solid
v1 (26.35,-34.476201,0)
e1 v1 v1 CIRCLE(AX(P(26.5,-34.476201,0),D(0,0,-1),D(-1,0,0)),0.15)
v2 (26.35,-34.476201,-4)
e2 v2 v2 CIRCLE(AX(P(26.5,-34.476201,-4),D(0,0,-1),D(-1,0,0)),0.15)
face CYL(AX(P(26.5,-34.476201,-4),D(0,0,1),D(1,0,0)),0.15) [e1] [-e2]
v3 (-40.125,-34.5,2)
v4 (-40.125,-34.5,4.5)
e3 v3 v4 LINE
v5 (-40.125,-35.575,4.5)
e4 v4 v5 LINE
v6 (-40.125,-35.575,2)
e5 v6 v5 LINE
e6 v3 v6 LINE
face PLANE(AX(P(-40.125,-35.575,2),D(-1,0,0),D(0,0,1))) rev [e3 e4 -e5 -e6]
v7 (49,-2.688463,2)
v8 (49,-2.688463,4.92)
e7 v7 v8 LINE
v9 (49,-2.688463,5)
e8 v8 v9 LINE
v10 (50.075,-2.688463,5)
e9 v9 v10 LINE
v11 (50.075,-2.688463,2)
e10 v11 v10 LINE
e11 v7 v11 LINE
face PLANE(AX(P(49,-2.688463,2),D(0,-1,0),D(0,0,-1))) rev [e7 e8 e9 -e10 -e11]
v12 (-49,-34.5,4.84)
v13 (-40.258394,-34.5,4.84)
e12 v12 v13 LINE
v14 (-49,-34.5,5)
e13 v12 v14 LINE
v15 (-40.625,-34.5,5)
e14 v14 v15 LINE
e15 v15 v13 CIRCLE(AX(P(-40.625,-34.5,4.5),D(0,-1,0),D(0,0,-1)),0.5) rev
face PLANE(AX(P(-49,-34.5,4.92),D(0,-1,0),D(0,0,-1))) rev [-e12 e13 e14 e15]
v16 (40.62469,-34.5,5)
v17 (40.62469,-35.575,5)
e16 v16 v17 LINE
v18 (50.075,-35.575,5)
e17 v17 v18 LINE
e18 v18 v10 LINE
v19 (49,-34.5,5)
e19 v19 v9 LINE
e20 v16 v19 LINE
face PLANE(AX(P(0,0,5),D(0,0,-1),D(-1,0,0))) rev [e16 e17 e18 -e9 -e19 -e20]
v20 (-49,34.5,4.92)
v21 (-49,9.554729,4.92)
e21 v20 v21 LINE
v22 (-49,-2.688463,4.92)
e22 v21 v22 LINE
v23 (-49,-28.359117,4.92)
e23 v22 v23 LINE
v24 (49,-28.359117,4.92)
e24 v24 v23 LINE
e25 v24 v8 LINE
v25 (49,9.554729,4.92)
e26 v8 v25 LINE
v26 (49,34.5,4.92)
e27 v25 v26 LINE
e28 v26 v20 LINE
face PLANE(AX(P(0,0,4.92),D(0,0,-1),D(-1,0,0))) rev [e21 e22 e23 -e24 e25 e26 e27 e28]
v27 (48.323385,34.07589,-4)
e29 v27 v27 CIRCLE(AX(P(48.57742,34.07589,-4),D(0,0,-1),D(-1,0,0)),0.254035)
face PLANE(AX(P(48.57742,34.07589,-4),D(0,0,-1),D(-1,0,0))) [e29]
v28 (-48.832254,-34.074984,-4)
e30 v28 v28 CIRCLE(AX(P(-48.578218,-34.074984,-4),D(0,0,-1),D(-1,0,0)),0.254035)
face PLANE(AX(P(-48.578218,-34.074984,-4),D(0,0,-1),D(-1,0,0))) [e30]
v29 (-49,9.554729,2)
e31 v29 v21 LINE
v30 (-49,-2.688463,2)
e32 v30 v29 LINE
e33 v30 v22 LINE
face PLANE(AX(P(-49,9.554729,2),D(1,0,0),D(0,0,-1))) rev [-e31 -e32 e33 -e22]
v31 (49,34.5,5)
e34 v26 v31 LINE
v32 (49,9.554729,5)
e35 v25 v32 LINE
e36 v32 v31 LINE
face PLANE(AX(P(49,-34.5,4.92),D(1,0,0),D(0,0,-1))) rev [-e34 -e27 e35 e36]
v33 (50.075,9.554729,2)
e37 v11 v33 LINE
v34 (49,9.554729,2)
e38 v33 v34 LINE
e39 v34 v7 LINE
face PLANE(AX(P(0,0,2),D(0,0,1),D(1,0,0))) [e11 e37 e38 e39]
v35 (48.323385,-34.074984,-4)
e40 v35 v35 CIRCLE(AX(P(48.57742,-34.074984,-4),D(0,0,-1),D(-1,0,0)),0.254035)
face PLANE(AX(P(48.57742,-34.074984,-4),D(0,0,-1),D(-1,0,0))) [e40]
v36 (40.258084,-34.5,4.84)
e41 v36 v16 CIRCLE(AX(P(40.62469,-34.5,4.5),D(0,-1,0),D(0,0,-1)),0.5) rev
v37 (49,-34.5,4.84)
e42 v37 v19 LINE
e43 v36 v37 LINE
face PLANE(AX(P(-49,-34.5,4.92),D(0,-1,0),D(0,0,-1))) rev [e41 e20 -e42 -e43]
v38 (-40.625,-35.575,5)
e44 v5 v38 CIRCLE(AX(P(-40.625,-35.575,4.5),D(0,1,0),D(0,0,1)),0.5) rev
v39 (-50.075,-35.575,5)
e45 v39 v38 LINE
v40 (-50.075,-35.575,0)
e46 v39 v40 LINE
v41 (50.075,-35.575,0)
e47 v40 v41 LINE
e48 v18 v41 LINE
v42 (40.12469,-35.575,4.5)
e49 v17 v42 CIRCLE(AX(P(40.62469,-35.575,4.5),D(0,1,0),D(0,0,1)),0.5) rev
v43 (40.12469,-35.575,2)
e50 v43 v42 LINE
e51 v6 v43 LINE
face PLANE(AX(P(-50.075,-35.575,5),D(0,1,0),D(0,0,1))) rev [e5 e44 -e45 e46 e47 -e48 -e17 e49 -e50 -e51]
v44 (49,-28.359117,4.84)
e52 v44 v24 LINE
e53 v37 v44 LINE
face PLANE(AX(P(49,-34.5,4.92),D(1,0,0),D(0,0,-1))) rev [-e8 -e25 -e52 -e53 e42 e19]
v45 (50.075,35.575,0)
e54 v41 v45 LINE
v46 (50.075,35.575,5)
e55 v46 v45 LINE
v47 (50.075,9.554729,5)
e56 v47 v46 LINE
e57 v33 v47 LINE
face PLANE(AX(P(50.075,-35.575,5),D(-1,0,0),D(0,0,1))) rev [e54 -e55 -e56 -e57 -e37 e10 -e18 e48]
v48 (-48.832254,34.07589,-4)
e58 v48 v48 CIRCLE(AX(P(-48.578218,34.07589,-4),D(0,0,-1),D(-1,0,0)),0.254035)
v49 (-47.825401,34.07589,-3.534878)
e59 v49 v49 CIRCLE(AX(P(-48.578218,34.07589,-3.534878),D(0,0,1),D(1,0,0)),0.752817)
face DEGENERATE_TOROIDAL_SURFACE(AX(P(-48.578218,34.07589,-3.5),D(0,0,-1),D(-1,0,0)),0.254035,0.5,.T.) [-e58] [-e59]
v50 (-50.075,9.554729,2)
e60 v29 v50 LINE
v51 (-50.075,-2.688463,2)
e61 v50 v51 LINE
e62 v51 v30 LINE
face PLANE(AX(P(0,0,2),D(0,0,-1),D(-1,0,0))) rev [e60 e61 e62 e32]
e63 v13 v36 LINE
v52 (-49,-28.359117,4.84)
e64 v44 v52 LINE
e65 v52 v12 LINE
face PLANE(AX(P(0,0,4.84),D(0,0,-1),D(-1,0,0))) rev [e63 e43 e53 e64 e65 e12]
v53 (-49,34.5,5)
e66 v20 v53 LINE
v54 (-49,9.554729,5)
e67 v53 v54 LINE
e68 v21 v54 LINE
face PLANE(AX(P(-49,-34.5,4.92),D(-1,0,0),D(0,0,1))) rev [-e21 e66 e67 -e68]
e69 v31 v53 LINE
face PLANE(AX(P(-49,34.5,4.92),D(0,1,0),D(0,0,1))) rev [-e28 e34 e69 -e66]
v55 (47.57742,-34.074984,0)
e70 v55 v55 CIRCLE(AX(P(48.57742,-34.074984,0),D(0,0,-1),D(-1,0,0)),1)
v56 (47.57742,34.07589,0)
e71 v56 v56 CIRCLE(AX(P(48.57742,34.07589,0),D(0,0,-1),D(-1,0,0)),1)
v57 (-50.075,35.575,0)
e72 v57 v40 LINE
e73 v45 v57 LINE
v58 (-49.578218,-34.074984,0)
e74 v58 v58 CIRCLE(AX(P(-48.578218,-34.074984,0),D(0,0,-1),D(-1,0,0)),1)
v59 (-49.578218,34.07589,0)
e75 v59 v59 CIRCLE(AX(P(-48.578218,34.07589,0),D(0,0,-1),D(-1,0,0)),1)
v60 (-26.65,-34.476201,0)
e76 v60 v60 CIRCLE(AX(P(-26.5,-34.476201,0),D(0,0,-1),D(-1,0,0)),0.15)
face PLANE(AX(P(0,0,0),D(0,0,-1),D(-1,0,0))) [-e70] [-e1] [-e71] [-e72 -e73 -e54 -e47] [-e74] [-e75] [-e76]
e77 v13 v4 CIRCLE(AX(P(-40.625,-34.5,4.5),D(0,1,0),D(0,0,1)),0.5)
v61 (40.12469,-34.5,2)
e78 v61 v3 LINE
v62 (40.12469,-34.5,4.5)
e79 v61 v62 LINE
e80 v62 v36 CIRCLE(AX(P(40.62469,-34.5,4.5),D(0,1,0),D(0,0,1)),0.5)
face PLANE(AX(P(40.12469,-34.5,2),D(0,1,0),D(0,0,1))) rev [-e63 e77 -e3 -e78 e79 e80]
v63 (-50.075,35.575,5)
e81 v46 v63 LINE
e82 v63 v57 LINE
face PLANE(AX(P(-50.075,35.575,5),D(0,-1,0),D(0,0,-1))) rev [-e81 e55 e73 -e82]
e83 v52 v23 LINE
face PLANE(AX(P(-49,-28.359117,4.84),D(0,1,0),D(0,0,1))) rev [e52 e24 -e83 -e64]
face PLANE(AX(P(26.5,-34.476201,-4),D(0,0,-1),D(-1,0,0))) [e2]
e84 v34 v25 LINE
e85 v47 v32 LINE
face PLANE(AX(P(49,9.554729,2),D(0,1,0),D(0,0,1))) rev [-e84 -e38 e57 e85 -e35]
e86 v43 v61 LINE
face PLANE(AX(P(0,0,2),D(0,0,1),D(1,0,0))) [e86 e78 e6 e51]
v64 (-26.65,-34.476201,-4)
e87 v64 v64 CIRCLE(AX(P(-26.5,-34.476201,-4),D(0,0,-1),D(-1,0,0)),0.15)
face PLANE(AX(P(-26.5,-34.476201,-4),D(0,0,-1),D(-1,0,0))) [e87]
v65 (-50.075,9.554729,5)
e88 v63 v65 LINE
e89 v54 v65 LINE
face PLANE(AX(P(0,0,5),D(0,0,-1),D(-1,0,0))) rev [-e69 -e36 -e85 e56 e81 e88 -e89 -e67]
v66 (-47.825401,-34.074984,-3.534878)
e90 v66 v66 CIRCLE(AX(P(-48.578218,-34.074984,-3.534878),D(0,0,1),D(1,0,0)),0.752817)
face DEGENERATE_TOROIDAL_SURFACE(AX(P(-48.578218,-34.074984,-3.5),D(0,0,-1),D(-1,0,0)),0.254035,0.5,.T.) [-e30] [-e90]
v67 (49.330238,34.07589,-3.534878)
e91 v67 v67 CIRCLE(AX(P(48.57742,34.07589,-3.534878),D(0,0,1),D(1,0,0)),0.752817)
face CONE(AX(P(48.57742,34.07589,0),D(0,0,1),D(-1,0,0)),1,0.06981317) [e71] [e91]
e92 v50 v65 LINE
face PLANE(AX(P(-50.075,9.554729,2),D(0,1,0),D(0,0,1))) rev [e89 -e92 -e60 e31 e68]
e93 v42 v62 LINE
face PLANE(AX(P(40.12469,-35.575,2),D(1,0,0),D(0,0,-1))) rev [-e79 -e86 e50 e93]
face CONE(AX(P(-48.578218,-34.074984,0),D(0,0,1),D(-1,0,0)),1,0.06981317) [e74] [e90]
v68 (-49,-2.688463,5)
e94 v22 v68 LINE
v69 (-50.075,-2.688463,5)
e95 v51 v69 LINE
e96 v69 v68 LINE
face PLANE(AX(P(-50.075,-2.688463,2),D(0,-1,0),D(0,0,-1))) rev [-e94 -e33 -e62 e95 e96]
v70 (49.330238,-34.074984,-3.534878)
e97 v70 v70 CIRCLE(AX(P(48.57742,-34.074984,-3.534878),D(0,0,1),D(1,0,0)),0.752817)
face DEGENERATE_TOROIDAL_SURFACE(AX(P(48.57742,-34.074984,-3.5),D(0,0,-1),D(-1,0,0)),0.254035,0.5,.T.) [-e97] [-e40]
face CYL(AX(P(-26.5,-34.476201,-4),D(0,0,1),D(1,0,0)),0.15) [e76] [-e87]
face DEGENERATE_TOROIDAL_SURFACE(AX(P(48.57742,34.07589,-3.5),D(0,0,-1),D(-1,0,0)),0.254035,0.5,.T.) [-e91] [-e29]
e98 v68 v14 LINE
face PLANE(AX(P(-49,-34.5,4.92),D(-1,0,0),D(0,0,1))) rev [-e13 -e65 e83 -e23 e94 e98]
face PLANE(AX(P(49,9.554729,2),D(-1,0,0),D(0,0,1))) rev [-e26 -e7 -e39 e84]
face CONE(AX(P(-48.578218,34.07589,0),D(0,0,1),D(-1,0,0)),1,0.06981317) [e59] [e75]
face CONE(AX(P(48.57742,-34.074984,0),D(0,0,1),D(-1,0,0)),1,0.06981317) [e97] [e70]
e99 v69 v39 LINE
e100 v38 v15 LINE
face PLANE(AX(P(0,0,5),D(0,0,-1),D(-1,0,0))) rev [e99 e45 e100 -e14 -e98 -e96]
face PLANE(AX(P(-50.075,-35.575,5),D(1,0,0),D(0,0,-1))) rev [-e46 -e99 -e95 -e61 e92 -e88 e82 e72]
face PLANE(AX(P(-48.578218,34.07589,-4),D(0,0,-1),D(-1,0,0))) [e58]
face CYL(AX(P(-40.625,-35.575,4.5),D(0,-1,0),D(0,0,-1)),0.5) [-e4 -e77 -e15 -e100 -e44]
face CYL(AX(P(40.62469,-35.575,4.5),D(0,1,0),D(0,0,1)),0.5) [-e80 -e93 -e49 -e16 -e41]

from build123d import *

# Parameters (mm, degrees)
ESQUISSE2_W                  = 100.15
ESQUISSE2_H                  = 71.15
BOSS_EXTRU_1_DEPTH           = 5
ESQUISSE3_W                  = 98
ESQUISSE3_H                  = 69
ENL_V_MAT_EXTRU_1_DEPTH      = 0.08
ESQUISSE4_W                  = 98
ESQUISSE4_H                  = 6.140882506
ENL_V_MAT_EXTRU_2_DEPTH      = 0.08
ESQUISSE5_W                  = 80.249689796
ESQUISSE5_H                  = 1.075
ENL_V_MAT_EXTRU_3_DEPTH      = 3
CONG_1_R                     = 0.5
CONG_2_R                     = 0.5
ESQUISSE7_W                  = 1.075
ESQUISSE7_H                  = 12.243191877
ENL_V_MAT_EXTRU_4_DEPTH      = 3
ESQUISSE8_R                  = 1
BOSS_EXTRU_3_DEPTH           = 4
BOSS_EXTRU_3_DRAFT           = 4
BOSS_EXTRU_3_PROFILE_2_DEPTH = 4
BOSS_EXTRU_3_PROFILE_2_DRAFT = 4
BOSS_EXTRU_3_PROFILE_3_DEPTH = 4
BOSS_EXTRU_3_PROFILE_3_DRAFT = 4
BOSS_EXTRU_3_PROFILE_4_DEPTH = 4
BOSS_EXTRU_3_PROFILE_4_DRAFT = 4
CONG_3_R                     = 0.5
CONG_4_R                     = 0.5
CONG_5_R                     = 0.5
CONG_6_R                     = 0.5
ESQUISSE9_R                  = 0.15
BOSS_EXTRU_5_DEPTH           = 4


with BuildPart() as part:
    # Esquisse2 → Boss.-Extru.1 (new body)
    with BuildSketch(Plane.XY):
        Rectangle(ESQUISSE2_W, ESQUISSE2_H)
    extrude(amount=BOSS_EXTRU_1_DEPTH)

    # Esquisse3 → Enlèv. mat.-Extru.1 (cut)
    with BuildSketch(Plane.XY.offset(5)):
        Rectangle(ESQUISSE3_W, ESQUISSE3_H)
    extrude(amount=-ENL_V_MAT_EXTRU_1_DEPTH, mode=Mode.SUBTRACT)

    # Esquisse4 → Enlèv. mat.-Extru.2 (cut)
    with BuildSketch(Plane.XY.offset(4.92)):
        with Locations((0, -31.429558747)):
            Rectangle(ESQUISSE4_W, ESQUISSE4_H)
    extrude(amount=-ENL_V_MAT_EXTRU_2_DEPTH, mode=Mode.SUBTRACT)

    # Esquisse5 → Enlèv. mat.-Extru.3 (cut)
    with BuildSketch(Plane.XY.offset(5)):
        with Locations((-0.000155102, -35.0375)):
            Rectangle(ESQUISSE5_W, ESQUISSE5_H)
    extrude(amount=-ENL_V_MAT_EXTRU_3_DEPTH, mode=Mode.SUBTRACT)

    # Congé1
    # the kernel refuses this fillet: 0.5 mm, written as the material it takes off along each edge
    with BuildSketch(Plane(origin=(-40.125, -36.825, 5), x_dir=(-1, 0, 0), z_dir=(0, 1, 0))) as cong_1_piece_1:
        with BuildLine():
            CenterArc((CONG_1_R, -CONG_1_R), CONG_1_R, 90, 90)
            Line((0, -CONG_1_R), (0, 0))
            Line((0, 0), (CONG_1_R, 0))
        make_face()
    extrude(amount=2.325, mode=Mode.SUBTRACT)

    # Congé2
    # the kernel refuses this fillet: 0.5 mm, written as the material it takes off along each edge
    with BuildSketch(Plane(origin=(40.124689796, -34.5, 5), x_dir=(0, 0, -1), z_dir=(0, -1, 0))) as cong_2_piece_1:
        with BuildLine():
            CenterArc((CONG_2_R, CONG_2_R), CONG_2_R, 180, 90)
            Line((0, CONG_2_R), (0, 0))
            Line((0, 0), (CONG_2_R, 0))
        make_face()
    extrude(amount=2.325, mode=Mode.SUBTRACT)

    # Esquisse7 → Enlèv. mat.-Extru.4 (cut)
    with BuildSketch(Plane.XY.offset(5)):
        with Locations((-49.5375, 3.433132672)):
            Rectangle(ESQUISSE7_W, ESQUISSE7_H)
        with Locations((49.5375, 3.433132672)):
            Rectangle(ESQUISSE7_W, ESQUISSE7_H)
    extrude(amount=-ENL_V_MAT_EXTRU_4_DEPTH, mode=Mode.SUBTRACT)


with BuildPart() as boss_extru_3_tool:
    # Esquisse8 → Boss.-Extru.3 (with draft: the straight prism first)
    with BuildSketch(Plane(origin=(0, 0, 0), x_dir=(-1, 0, 0), z_dir=(0, 0, -1))):
        with Locations((-48.577420287, -34.074984175)):
            Circle(ESQUISSE8_R)
    extrude(amount=BOSS_EXTRU_3_DEPTH)
    # Boss.-Extru.3: the draft: its side faces are tilted about the plane it starts from
    boss_extru_3_sides = [boss_extru_3_tool.faces().sort_by_distance(p)[0] for p in [
        (49.577420287, -34.074984175, -2),
    ]]
    draft(boss_extru_3_sides, Plane(origin=(0, 0, 0), x_dir=(-1, 0, 0), z_dir=(0, 0, -1)), BOSS_EXTRU_3_DRAFT)


with BuildPart() as part_1:
    add(part.part)

    # Boss.-Extru.3: add boss_extru_3_tool
    add(boss_extru_3_tool.part)


with BuildPart() as boss_extru_3_profile_2_tool:
    # Esquisse8 → Boss.-Extru.3 profile 2 (with draft: the straight prism first)
    with BuildSketch(Plane(origin=(0, 0, 0), x_dir=(-1, 0, 0), z_dir=(0, 0, -1))):
        with Locations((-48.577420287, 34.07588992)):
            Circle(ESQUISSE8_R)
    extrude(amount=BOSS_EXTRU_3_PROFILE_2_DEPTH)
    # Boss.-Extru.3 profile 2: the draft: its side faces are tilted about the plane it starts from
    boss_extru_3_profile_2_sides = [boss_extru_3_profile_2_tool.faces().sort_by_distance(p)[0] for p in [
        (49.577420287, 34.07588992, -2),
    ]]
    draft(boss_extru_3_profile_2_sides, Plane(origin=(0, 0, 0), x_dir=(-1, 0, 0), z_dir=(0, 0, -1)), BOSS_EXTRU_3_PROFILE_2_DRAFT)


with BuildPart() as part_2:
    add(part_1.part)

    # Boss.-Extru.3 profile 2: add boss_extru_3_profile_2_tool
    add(boss_extru_3_profile_2_tool.part)


with BuildPart() as boss_extru_3_profile_3_tool:
    # Esquisse8 → Boss.-Extru.3 profile 3 (with draft: the straight prism first)
    with BuildSketch(Plane(origin=(0, 0, 0), x_dir=(-1, 0, 0), z_dir=(0, 0, -1))):
        with Locations((48.578218454, 34.07588992)):
            Circle(ESQUISSE8_R)
    extrude(amount=BOSS_EXTRU_3_PROFILE_3_DEPTH)
    # Boss.-Extru.3 profile 3: the draft: its side faces are tilted about the plane it starts from
    boss_extru_3_profile_3_sides = [boss_extru_3_profile_3_tool.faces().sort_by_distance(p)[0] for p in [
        (-47.578218454, 34.07588992, -2),
    ]]
    draft(boss_extru_3_profile_3_sides, Plane(origin=(0, 0, 0), x_dir=(-1, 0, 0), z_dir=(0, 0, -1)), BOSS_EXTRU_3_PROFILE_3_DRAFT)


with BuildPart() as part_3:
    add(part_2.part)

    # Boss.-Extru.3 profile 3: add boss_extru_3_profile_3_tool
    add(boss_extru_3_profile_3_tool.part)


with BuildPart() as boss_extru_3_profile_4_tool:
    # Esquisse8 → Boss.-Extru.3 profile 4 (with draft: the straight prism first)
    with BuildSketch(Plane(origin=(0, 0, 0), x_dir=(-1, 0, 0), z_dir=(0, 0, -1))):
        with Locations((48.578218454, -34.074984175)):
            Circle(ESQUISSE8_R)
    extrude(amount=BOSS_EXTRU_3_PROFILE_4_DEPTH)
    # Boss.-Extru.3 profile 4: the draft: its side faces are tilted about the plane it starts from
    boss_extru_3_profile_4_sides = [boss_extru_3_profile_4_tool.faces().sort_by_distance(p)[0] for p in [
        (-47.578218454, -34.074984175, -2),
    ]]
    draft(boss_extru_3_profile_4_sides, Plane(origin=(0, 0, 0), x_dir=(-1, 0, 0), z_dir=(0, 0, -1)), BOSS_EXTRU_3_PROFILE_4_DRAFT)


with BuildPart() as part_4:
    add(part_3.part)

    # Boss.-Extru.3 profile 4: add boss_extru_3_profile_4_tool
    add(boss_extru_3_profile_4_tool.part)

    # Congé3
    cong_3_edges = [part_4.edges().sort_by_distance(p)[0] for p in [
        (49.297713039, 34.07588992, -4),
    ]]
    fillet(cong_3_edges, radius=CONG_3_R)

    # Congé4
    cong_4_edges = [part_4.edges().sort_by_distance(p)[0] for p in [
        (-47.857925701, 34.07588992, -4),
    ]]
    fillet(cong_4_edges, radius=CONG_4_R)

    # Congé5
    cong_5_edges = [part_4.edges().sort_by_distance(p)[0] for p in [
        (-47.857925701, -34.074984175, -4),
    ]]
    fillet(cong_5_edges, radius=CONG_5_R)

    # Congé6
    cong_6_edges = [part_4.edges().sort_by_distance(p)[0] for p in [
        (49.297713039, -34.074984175, -4),
    ]]
    fillet(cong_6_edges, radius=CONG_6_R)

    # Esquisse9 → Boss.-Extru.5 (add)
    with BuildSketch(Plane(origin=(0, 0, 0), x_dir=(-1, 0, 0), z_dir=(0, 0, -1))):
        with Locations((26.5, -34.476200763)):
            Circle(ESQUISSE9_R)
        with Locations((-26.5, -34.476200763)):
            Circle(ESQUISSE9_R)
    extrude(amount=BOSS_EXTRU_5_DEPTH)


solid = part_4.part
